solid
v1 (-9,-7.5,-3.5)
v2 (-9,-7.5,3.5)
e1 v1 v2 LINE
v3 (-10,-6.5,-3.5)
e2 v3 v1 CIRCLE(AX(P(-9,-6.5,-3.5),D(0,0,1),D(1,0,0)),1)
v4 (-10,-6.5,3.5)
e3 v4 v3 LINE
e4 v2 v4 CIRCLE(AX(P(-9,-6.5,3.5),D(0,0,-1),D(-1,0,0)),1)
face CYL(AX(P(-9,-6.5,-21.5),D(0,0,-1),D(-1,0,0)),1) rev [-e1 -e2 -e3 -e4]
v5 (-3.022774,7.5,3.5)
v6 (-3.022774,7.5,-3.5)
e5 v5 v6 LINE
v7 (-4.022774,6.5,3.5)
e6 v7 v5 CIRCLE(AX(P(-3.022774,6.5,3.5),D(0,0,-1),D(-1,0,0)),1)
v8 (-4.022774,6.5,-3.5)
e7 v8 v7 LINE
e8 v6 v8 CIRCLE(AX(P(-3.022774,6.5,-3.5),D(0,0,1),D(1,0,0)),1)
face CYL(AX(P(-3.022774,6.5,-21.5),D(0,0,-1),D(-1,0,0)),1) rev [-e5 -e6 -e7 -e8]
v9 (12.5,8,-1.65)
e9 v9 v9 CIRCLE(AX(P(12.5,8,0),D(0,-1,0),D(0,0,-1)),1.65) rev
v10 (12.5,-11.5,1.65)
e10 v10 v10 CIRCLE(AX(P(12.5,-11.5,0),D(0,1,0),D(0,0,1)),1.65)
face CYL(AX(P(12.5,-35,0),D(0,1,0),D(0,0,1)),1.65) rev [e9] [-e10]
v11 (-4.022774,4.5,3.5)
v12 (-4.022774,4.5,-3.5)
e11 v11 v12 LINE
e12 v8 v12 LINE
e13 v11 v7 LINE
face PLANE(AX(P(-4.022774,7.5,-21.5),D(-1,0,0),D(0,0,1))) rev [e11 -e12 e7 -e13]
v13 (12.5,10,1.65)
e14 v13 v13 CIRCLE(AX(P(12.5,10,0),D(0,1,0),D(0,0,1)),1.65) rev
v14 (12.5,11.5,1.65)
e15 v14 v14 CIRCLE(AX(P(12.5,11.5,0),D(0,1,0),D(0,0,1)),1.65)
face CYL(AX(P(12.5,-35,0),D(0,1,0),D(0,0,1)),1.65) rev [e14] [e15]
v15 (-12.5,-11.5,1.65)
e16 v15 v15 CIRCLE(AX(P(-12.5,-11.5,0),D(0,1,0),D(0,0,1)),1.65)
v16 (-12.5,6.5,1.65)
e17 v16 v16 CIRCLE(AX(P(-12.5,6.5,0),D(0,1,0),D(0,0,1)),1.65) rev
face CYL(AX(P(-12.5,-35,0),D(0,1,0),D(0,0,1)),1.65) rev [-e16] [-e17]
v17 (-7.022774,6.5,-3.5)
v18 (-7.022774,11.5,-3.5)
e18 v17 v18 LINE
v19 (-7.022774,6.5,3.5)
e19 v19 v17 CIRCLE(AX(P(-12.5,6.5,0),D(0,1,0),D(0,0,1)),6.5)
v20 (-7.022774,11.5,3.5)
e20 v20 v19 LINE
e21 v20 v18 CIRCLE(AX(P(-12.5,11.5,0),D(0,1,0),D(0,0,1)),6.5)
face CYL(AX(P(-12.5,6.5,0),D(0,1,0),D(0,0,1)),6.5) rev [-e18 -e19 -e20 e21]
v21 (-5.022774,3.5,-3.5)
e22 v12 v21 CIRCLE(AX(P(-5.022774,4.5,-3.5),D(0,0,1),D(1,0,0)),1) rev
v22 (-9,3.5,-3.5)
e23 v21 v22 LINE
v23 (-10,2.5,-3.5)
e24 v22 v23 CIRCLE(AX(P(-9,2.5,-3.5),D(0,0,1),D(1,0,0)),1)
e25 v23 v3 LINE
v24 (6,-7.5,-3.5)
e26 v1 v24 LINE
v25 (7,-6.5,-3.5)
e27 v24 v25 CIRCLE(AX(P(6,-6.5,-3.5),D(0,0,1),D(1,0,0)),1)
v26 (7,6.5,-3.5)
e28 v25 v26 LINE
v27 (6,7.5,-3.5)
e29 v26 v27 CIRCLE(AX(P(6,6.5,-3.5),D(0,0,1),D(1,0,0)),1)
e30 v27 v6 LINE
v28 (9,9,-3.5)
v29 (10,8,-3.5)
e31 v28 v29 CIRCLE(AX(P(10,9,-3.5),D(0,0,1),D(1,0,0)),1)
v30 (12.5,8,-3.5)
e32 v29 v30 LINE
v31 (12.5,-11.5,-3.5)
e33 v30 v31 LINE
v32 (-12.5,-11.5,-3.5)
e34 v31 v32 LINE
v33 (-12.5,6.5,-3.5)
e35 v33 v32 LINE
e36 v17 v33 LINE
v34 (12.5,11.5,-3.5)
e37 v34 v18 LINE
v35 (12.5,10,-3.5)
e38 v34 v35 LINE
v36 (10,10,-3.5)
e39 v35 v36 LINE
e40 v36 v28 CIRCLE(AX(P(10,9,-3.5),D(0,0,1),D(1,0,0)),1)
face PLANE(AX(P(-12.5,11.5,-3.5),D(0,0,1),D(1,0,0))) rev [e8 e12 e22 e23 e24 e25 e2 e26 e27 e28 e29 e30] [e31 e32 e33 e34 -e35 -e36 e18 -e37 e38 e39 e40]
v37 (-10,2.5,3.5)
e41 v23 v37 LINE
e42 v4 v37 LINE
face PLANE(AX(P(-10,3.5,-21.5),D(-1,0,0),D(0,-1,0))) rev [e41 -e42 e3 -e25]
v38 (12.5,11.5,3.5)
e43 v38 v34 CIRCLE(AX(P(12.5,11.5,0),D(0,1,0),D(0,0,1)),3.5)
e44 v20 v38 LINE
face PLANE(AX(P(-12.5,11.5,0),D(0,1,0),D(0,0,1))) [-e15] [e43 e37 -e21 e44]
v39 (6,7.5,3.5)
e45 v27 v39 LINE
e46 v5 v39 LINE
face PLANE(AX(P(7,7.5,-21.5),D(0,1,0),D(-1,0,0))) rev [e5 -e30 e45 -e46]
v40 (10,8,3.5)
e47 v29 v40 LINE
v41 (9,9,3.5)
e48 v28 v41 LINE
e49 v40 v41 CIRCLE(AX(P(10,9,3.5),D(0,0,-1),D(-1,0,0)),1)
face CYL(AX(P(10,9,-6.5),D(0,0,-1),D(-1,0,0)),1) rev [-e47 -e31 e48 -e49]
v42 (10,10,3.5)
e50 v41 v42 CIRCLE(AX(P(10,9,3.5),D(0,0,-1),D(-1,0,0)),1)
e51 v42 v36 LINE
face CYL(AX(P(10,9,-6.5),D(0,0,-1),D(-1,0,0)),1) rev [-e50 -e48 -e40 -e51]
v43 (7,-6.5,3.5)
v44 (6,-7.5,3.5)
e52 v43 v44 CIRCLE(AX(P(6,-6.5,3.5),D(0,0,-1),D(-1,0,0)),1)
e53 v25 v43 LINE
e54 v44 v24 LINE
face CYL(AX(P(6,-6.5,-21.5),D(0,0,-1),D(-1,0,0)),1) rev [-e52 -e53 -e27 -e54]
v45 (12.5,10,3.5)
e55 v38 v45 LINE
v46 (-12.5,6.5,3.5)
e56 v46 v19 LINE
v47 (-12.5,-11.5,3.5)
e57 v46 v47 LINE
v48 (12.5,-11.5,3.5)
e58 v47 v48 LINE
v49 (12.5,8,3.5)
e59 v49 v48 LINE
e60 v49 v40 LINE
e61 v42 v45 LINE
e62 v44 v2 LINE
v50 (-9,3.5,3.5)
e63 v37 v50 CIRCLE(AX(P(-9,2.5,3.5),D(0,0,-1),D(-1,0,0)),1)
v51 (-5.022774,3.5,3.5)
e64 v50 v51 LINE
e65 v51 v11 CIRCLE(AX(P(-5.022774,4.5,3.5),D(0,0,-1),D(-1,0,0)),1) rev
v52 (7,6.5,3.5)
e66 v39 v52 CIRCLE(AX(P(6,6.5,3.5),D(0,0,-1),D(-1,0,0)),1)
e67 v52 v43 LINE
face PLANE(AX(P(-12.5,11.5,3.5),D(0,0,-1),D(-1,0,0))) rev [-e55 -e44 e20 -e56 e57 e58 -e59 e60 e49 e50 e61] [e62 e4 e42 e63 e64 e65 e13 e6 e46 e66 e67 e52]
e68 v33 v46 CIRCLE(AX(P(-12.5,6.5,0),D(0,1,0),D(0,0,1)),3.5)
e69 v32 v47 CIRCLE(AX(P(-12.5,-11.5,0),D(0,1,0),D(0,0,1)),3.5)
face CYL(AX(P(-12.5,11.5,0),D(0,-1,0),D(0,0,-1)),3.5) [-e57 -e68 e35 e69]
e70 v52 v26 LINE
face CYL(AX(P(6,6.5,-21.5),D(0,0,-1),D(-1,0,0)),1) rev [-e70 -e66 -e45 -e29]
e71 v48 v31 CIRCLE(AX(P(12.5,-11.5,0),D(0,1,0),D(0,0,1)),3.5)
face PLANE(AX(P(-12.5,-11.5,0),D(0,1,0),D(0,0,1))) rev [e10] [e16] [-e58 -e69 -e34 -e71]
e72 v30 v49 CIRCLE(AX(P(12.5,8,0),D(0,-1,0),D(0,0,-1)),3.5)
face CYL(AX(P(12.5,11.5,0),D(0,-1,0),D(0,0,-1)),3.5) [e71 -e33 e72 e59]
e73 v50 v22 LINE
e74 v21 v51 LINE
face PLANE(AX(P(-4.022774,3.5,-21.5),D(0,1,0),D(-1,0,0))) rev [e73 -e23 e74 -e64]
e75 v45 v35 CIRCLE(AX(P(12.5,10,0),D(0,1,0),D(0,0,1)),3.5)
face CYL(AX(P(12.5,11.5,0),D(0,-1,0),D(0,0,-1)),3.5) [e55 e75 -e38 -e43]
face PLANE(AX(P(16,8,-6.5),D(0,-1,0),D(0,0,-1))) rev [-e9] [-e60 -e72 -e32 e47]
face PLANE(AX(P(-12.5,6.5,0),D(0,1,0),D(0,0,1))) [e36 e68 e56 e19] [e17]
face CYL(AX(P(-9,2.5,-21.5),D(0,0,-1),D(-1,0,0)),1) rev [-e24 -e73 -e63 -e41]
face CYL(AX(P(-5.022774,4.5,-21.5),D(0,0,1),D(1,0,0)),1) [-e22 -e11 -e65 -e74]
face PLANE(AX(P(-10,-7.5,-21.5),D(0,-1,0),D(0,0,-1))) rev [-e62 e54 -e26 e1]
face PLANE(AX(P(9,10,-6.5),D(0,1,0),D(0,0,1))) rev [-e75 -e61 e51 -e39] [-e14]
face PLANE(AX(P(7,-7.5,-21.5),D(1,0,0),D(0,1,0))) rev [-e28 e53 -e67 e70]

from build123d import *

# Parameters (mm, degrees)
EXTRUDE_1_DEPTH     = 11.5
SKETCH_2_R          = 1.65
CUT_EXTRUDE_1_DEPTH = 46.5
SKETCH_4_R          = 6.5
CUT_EXTRUDE_2_DEPTH = 5
SKETCH_5_W          = 7
SKETCH_5_H          = 2
CUT_EXTRUDE_3_DEPTH = 10
FILLET_1_R          = 1
CUT_EXTRUDE_4_DEPTH = 25
FILLET_2_R          = 1


with BuildPart() as part:
    # 草图1 → 凸台-拉伸1 (new, symmetric)
    with BuildSketch(Plane(origin=(0, 0, 0), x_dir=(1, 0, 0), z_dir=(0, 1, 0))):
        with BuildLine():
            Line((-12.5, 3.5), (12.5, 3.5))
            ThreePointArc((12.5, 3.5), (16, 0), (12.5, -3.5))
            Line((12.5, -3.5), (-12.5, -3.5))
            ThreePointArc((-12.5, -3.5), (-16, 0), (-12.5, 3.5))
        make_face()
    extrude(amount=EXTRUDE_1_DEPTH, both=True)

    # 草图2 → 切除-拉伸1 (cut, symmetric)
    with BuildSketch(Plane(origin=(0, 11.5, 0), x_dir=(1, 0, 0), z_dir=(0, 1, 0))):
        with Locations(Location((12.5, 0, 0), (0, 0, 270))):
            Circle(SKETCH_2_R)
        with Locations(Location((-12.5, 0, 0), (0, 0, 270))):
            Circle(SKETCH_2_R)
    extrude(amount=CUT_EXTRUDE_1_DEPTH, both=True, mode=Mode.SUBTRACT)

    # 草图4 → 切除-拉伸2 (cut, symmetric)
    with BuildSketch(Plane(origin=(0, 11.5, 0), x_dir=(1, 0, 0), z_dir=(0, 1, 0))):
        with Locations((-12.5, 0)):
            Circle(SKETCH_4_R)
    extrude(amount=CUT_EXTRUDE_2_DEPTH, both=True, mode=Mode.SUBTRACT)

    # 草图5 → 切除-拉伸3 (cut, symmetric)
    with BuildSketch(Plane.XY.offset(3.5)):
        with Locations((12.5, 9)):
            Rectangle(SKETCH_5_W, SKETCH_5_H)
    extrude(amount=CUT_EXTRUDE_3_DEPTH, both=True, mode=Mode.SUBTRACT)

    # 圆角1
    fillet_1_edges = [part.edges().sort_by_distance(p)[0] for p in [
        (9, 8, 0),
        (9, 10, 0),
    ]]
    fillet(fillet_1_edges, radius=FILLET_1_R - 0.0001)  # a hair under: the kernel refuses the full size

    # 草图6 → 切除-拉伸4 (cut, symmetric)
    with BuildSketch(Plane.XY.offset(3.5)):
        Polygon((-10, 3.5), (-10, -7.5), (7, -7.5), (7, 7.5), (-4.022774425, 7.5), (-4.022774425, 3.5), align=None)
    extrude(amount=CUT_EXTRUDE_4_DEPTH, both=True, mode=Mode.SUBTRACT)

    # 圆角2
    fillet_2_edges = [part.edges().sort_by_distance(p)[0] for p in [
        (-10, 3.5, 0),
        (-4.022774425, 3.5, 0),
        (-4.022774425, 7.5, 0),
        (7, 7.5, 0),
        (7, -7.5, 0),
        (-10, -7.5, 0),
    ]]
    fillet(fillet_2_edges, radius=FILLET_2_R)


solid = part.part
